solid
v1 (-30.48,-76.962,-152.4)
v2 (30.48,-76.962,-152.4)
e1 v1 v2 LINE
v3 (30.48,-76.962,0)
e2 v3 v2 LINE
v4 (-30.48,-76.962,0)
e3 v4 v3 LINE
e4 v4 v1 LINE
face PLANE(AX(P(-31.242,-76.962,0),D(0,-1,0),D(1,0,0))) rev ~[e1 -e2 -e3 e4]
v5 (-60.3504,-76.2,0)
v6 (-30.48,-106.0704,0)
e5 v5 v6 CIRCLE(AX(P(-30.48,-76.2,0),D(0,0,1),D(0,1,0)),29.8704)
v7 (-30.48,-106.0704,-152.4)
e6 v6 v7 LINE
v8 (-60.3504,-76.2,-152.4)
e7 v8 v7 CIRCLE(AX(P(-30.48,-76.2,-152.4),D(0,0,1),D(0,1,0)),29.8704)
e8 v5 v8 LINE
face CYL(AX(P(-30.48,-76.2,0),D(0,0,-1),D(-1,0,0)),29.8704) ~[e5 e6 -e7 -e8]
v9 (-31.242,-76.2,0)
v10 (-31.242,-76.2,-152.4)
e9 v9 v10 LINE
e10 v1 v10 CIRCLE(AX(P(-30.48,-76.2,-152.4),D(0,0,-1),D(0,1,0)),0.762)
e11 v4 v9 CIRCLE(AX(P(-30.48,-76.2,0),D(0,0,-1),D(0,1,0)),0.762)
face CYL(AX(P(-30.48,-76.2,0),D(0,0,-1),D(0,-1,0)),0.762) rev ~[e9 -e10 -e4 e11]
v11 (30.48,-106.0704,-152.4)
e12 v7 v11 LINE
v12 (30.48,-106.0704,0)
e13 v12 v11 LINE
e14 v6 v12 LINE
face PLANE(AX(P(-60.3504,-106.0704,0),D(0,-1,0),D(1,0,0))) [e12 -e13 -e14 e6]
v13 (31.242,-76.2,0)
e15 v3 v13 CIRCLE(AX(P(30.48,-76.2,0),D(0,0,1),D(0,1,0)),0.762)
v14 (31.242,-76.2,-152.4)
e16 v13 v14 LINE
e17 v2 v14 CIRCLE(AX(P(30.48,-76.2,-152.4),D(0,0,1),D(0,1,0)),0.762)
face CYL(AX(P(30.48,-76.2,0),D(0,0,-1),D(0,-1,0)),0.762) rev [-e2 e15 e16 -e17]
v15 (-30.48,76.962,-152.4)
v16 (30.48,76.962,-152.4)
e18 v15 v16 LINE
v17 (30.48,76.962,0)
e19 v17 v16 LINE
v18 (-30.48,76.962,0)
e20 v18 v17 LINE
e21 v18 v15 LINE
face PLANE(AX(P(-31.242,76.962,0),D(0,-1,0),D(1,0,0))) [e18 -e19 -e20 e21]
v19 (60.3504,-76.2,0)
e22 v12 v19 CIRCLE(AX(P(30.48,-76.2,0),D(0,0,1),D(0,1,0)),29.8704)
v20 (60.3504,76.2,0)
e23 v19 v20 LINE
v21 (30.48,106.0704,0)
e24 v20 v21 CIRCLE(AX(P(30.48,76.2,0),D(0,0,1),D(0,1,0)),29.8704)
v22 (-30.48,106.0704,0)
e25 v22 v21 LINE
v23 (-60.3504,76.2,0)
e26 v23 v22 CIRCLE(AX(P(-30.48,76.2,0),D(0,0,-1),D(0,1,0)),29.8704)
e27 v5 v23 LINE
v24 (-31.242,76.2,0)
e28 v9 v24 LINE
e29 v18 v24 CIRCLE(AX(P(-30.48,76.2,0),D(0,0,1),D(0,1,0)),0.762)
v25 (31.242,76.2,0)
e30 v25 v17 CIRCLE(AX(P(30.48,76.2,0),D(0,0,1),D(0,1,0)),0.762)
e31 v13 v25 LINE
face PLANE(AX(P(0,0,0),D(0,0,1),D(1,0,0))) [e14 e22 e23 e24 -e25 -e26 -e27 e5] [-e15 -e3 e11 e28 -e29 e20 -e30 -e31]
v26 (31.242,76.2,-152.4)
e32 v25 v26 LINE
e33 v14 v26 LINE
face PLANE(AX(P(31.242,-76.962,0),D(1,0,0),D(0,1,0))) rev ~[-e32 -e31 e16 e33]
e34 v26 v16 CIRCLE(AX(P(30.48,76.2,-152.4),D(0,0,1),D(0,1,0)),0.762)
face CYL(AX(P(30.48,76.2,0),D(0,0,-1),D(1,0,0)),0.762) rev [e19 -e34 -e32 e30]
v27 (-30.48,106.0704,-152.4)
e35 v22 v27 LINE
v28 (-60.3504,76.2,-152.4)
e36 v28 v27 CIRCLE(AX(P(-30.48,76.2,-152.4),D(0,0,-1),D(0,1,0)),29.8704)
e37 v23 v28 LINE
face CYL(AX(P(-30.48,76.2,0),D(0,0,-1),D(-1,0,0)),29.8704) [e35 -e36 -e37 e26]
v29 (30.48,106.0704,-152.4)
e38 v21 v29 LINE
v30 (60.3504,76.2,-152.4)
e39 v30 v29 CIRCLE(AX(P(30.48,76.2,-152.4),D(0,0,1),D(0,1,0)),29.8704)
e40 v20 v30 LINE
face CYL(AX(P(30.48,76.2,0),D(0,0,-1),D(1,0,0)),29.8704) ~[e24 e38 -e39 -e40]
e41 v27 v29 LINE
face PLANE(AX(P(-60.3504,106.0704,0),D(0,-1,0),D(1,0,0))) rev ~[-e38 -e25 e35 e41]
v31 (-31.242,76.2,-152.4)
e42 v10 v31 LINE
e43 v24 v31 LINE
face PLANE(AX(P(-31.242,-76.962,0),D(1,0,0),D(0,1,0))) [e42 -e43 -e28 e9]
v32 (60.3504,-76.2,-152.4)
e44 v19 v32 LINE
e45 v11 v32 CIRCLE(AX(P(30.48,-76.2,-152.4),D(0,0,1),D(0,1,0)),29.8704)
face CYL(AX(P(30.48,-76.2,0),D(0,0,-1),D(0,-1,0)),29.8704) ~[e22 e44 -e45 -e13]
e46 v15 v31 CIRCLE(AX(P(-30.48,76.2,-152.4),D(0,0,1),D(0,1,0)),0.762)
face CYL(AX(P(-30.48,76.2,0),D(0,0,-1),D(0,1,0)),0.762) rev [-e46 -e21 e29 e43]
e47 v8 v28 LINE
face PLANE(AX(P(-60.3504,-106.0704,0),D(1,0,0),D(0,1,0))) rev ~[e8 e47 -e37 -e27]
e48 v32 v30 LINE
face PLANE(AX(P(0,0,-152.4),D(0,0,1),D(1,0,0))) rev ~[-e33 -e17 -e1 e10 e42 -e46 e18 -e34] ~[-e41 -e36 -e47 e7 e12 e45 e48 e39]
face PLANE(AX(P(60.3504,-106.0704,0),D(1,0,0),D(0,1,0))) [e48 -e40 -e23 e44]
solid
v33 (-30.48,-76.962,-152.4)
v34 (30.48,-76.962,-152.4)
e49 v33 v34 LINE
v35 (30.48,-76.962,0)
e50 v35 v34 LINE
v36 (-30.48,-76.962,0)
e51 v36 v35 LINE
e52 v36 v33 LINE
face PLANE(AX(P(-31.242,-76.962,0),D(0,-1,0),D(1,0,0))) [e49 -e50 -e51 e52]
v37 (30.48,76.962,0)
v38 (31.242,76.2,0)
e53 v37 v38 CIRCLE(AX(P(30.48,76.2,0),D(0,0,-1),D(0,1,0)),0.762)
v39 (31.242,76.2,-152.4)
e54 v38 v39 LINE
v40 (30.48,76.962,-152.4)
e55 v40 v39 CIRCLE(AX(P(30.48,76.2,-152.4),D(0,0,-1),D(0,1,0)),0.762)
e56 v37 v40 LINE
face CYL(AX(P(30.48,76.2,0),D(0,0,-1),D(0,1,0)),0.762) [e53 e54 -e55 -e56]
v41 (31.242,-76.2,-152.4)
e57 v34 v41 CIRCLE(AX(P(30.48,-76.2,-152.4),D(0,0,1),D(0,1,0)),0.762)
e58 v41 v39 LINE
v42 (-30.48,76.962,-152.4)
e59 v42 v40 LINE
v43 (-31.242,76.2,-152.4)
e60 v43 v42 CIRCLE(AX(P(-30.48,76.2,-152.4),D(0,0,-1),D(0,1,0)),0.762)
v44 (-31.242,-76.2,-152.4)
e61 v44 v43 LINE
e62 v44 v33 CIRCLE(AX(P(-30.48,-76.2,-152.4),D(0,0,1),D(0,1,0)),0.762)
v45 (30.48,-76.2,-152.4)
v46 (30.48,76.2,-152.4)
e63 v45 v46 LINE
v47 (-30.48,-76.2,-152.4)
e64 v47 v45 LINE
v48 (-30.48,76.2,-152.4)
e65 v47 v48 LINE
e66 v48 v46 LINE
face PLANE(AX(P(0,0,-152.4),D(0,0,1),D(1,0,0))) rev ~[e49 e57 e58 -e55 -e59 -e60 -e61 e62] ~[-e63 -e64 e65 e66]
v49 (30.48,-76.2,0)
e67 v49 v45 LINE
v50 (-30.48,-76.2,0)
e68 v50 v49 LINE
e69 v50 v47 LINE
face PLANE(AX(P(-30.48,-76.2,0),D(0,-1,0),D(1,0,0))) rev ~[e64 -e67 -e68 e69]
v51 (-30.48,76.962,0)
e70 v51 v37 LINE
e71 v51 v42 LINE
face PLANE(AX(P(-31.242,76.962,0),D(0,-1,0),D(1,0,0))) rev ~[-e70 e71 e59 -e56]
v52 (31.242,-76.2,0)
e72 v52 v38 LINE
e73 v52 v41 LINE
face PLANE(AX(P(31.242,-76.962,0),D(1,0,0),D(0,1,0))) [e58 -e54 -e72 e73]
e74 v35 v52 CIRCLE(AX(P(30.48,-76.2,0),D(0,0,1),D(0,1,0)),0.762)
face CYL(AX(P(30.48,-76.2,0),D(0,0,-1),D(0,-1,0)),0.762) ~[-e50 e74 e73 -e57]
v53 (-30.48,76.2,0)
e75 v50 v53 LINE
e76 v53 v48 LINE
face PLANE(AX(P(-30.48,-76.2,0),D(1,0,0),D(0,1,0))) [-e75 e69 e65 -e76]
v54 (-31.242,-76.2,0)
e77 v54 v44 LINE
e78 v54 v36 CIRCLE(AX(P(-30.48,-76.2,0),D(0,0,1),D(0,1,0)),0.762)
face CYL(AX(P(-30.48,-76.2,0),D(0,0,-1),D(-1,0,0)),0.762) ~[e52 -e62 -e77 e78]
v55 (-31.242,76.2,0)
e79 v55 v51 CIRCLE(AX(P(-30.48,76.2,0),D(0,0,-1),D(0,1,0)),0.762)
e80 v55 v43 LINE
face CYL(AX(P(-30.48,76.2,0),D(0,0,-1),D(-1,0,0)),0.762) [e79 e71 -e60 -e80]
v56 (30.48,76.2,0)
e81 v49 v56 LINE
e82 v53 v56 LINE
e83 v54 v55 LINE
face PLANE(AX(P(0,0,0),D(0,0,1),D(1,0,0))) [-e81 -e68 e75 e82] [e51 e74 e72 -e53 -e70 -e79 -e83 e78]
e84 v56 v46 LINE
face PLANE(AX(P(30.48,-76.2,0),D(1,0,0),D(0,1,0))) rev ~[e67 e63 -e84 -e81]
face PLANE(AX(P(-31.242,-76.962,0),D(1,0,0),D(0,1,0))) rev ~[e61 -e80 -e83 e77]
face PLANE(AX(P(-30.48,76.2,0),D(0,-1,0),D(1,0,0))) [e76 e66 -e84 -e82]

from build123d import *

# Parameters (mm, degrees)
F4_W      = 120.7008
F4_H      = 212.1408
F5_DEPTH  = 152.4
F6_R      = 29.8704
F7_W      = 62.484
F7_H      = 153.924
F8_DEPTH  = 152.4
F9_W      = 62.484
F9_H      = 153.924
F10_DEPTH = 152.4
F11_W     = 60.96
F11_H     = 152.4
F12_DEPTH = 152.4
F13_R     = 0.762
F14_R     = 0.762


with BuildPart() as f5:
    # F4 (on Top) → F5 (new body)
    with BuildSketch(Plane.XY):
        Rectangle(F4_W, F4_H)
    extrude(amount=-F5_DEPTH)

    # F6
    f6_edges = [f5.edges().sort_by_distance(p)[0] for p in [
        (-60.3504, 106.0704, -76.2),
        (60.3504, 106.0704, -76.2),
        (60.3504, -106.0704, -76.2),
        (-60.3504, -106.0704, -76.2),
    ]]
    fillet(f6_edges, radius=F6_R)

    # F7 (on face) → F8 (cut)
    with BuildSketch(Plane.XY):
        Rectangle(F7_W, F7_H)
    extrude(amount=-F8_DEPTH, mode=Mode.SUBTRACT)

    # F14
    f14_edges = [f5.edges().sort_by_distance(p)[0] for p in [
        (-31.242, 76.962, -76.2),
        (-31.242, -76.962, -76.2),
        (31.242, -76.962, -76.2),
        (31.242, 76.962, -76.2),
    ]]
    fillet(f14_edges, radius=F14_R)


with BuildPart() as f10:
    # F9 (on face) → F10 (new body)
    with BuildSketch(Plane.XY):
        Rectangle(F9_W, F9_H)
    extrude(amount=-F10_DEPTH)

    # F11 (on face) → F12 (cut)
    with BuildSketch(Plane.XY):
        Rectangle(F11_W, F11_H)
    extrude(amount=-F12_DEPTH, mode=Mode.SUBTRACT)

    # F13
    f13_edges = [f10.edges().sort_by_distance(p)[0] for p in [
        (-31.242, 76.962, -76.2),
        (31.242, 76.962, -76.2),
        (31.242, -76.962, -76.2),
        (-31.242, -76.962, -76.2),
    ]]
    fillet(f13_edges, radius=F13_R)


solid = Compound([f5.part, f10.part])
